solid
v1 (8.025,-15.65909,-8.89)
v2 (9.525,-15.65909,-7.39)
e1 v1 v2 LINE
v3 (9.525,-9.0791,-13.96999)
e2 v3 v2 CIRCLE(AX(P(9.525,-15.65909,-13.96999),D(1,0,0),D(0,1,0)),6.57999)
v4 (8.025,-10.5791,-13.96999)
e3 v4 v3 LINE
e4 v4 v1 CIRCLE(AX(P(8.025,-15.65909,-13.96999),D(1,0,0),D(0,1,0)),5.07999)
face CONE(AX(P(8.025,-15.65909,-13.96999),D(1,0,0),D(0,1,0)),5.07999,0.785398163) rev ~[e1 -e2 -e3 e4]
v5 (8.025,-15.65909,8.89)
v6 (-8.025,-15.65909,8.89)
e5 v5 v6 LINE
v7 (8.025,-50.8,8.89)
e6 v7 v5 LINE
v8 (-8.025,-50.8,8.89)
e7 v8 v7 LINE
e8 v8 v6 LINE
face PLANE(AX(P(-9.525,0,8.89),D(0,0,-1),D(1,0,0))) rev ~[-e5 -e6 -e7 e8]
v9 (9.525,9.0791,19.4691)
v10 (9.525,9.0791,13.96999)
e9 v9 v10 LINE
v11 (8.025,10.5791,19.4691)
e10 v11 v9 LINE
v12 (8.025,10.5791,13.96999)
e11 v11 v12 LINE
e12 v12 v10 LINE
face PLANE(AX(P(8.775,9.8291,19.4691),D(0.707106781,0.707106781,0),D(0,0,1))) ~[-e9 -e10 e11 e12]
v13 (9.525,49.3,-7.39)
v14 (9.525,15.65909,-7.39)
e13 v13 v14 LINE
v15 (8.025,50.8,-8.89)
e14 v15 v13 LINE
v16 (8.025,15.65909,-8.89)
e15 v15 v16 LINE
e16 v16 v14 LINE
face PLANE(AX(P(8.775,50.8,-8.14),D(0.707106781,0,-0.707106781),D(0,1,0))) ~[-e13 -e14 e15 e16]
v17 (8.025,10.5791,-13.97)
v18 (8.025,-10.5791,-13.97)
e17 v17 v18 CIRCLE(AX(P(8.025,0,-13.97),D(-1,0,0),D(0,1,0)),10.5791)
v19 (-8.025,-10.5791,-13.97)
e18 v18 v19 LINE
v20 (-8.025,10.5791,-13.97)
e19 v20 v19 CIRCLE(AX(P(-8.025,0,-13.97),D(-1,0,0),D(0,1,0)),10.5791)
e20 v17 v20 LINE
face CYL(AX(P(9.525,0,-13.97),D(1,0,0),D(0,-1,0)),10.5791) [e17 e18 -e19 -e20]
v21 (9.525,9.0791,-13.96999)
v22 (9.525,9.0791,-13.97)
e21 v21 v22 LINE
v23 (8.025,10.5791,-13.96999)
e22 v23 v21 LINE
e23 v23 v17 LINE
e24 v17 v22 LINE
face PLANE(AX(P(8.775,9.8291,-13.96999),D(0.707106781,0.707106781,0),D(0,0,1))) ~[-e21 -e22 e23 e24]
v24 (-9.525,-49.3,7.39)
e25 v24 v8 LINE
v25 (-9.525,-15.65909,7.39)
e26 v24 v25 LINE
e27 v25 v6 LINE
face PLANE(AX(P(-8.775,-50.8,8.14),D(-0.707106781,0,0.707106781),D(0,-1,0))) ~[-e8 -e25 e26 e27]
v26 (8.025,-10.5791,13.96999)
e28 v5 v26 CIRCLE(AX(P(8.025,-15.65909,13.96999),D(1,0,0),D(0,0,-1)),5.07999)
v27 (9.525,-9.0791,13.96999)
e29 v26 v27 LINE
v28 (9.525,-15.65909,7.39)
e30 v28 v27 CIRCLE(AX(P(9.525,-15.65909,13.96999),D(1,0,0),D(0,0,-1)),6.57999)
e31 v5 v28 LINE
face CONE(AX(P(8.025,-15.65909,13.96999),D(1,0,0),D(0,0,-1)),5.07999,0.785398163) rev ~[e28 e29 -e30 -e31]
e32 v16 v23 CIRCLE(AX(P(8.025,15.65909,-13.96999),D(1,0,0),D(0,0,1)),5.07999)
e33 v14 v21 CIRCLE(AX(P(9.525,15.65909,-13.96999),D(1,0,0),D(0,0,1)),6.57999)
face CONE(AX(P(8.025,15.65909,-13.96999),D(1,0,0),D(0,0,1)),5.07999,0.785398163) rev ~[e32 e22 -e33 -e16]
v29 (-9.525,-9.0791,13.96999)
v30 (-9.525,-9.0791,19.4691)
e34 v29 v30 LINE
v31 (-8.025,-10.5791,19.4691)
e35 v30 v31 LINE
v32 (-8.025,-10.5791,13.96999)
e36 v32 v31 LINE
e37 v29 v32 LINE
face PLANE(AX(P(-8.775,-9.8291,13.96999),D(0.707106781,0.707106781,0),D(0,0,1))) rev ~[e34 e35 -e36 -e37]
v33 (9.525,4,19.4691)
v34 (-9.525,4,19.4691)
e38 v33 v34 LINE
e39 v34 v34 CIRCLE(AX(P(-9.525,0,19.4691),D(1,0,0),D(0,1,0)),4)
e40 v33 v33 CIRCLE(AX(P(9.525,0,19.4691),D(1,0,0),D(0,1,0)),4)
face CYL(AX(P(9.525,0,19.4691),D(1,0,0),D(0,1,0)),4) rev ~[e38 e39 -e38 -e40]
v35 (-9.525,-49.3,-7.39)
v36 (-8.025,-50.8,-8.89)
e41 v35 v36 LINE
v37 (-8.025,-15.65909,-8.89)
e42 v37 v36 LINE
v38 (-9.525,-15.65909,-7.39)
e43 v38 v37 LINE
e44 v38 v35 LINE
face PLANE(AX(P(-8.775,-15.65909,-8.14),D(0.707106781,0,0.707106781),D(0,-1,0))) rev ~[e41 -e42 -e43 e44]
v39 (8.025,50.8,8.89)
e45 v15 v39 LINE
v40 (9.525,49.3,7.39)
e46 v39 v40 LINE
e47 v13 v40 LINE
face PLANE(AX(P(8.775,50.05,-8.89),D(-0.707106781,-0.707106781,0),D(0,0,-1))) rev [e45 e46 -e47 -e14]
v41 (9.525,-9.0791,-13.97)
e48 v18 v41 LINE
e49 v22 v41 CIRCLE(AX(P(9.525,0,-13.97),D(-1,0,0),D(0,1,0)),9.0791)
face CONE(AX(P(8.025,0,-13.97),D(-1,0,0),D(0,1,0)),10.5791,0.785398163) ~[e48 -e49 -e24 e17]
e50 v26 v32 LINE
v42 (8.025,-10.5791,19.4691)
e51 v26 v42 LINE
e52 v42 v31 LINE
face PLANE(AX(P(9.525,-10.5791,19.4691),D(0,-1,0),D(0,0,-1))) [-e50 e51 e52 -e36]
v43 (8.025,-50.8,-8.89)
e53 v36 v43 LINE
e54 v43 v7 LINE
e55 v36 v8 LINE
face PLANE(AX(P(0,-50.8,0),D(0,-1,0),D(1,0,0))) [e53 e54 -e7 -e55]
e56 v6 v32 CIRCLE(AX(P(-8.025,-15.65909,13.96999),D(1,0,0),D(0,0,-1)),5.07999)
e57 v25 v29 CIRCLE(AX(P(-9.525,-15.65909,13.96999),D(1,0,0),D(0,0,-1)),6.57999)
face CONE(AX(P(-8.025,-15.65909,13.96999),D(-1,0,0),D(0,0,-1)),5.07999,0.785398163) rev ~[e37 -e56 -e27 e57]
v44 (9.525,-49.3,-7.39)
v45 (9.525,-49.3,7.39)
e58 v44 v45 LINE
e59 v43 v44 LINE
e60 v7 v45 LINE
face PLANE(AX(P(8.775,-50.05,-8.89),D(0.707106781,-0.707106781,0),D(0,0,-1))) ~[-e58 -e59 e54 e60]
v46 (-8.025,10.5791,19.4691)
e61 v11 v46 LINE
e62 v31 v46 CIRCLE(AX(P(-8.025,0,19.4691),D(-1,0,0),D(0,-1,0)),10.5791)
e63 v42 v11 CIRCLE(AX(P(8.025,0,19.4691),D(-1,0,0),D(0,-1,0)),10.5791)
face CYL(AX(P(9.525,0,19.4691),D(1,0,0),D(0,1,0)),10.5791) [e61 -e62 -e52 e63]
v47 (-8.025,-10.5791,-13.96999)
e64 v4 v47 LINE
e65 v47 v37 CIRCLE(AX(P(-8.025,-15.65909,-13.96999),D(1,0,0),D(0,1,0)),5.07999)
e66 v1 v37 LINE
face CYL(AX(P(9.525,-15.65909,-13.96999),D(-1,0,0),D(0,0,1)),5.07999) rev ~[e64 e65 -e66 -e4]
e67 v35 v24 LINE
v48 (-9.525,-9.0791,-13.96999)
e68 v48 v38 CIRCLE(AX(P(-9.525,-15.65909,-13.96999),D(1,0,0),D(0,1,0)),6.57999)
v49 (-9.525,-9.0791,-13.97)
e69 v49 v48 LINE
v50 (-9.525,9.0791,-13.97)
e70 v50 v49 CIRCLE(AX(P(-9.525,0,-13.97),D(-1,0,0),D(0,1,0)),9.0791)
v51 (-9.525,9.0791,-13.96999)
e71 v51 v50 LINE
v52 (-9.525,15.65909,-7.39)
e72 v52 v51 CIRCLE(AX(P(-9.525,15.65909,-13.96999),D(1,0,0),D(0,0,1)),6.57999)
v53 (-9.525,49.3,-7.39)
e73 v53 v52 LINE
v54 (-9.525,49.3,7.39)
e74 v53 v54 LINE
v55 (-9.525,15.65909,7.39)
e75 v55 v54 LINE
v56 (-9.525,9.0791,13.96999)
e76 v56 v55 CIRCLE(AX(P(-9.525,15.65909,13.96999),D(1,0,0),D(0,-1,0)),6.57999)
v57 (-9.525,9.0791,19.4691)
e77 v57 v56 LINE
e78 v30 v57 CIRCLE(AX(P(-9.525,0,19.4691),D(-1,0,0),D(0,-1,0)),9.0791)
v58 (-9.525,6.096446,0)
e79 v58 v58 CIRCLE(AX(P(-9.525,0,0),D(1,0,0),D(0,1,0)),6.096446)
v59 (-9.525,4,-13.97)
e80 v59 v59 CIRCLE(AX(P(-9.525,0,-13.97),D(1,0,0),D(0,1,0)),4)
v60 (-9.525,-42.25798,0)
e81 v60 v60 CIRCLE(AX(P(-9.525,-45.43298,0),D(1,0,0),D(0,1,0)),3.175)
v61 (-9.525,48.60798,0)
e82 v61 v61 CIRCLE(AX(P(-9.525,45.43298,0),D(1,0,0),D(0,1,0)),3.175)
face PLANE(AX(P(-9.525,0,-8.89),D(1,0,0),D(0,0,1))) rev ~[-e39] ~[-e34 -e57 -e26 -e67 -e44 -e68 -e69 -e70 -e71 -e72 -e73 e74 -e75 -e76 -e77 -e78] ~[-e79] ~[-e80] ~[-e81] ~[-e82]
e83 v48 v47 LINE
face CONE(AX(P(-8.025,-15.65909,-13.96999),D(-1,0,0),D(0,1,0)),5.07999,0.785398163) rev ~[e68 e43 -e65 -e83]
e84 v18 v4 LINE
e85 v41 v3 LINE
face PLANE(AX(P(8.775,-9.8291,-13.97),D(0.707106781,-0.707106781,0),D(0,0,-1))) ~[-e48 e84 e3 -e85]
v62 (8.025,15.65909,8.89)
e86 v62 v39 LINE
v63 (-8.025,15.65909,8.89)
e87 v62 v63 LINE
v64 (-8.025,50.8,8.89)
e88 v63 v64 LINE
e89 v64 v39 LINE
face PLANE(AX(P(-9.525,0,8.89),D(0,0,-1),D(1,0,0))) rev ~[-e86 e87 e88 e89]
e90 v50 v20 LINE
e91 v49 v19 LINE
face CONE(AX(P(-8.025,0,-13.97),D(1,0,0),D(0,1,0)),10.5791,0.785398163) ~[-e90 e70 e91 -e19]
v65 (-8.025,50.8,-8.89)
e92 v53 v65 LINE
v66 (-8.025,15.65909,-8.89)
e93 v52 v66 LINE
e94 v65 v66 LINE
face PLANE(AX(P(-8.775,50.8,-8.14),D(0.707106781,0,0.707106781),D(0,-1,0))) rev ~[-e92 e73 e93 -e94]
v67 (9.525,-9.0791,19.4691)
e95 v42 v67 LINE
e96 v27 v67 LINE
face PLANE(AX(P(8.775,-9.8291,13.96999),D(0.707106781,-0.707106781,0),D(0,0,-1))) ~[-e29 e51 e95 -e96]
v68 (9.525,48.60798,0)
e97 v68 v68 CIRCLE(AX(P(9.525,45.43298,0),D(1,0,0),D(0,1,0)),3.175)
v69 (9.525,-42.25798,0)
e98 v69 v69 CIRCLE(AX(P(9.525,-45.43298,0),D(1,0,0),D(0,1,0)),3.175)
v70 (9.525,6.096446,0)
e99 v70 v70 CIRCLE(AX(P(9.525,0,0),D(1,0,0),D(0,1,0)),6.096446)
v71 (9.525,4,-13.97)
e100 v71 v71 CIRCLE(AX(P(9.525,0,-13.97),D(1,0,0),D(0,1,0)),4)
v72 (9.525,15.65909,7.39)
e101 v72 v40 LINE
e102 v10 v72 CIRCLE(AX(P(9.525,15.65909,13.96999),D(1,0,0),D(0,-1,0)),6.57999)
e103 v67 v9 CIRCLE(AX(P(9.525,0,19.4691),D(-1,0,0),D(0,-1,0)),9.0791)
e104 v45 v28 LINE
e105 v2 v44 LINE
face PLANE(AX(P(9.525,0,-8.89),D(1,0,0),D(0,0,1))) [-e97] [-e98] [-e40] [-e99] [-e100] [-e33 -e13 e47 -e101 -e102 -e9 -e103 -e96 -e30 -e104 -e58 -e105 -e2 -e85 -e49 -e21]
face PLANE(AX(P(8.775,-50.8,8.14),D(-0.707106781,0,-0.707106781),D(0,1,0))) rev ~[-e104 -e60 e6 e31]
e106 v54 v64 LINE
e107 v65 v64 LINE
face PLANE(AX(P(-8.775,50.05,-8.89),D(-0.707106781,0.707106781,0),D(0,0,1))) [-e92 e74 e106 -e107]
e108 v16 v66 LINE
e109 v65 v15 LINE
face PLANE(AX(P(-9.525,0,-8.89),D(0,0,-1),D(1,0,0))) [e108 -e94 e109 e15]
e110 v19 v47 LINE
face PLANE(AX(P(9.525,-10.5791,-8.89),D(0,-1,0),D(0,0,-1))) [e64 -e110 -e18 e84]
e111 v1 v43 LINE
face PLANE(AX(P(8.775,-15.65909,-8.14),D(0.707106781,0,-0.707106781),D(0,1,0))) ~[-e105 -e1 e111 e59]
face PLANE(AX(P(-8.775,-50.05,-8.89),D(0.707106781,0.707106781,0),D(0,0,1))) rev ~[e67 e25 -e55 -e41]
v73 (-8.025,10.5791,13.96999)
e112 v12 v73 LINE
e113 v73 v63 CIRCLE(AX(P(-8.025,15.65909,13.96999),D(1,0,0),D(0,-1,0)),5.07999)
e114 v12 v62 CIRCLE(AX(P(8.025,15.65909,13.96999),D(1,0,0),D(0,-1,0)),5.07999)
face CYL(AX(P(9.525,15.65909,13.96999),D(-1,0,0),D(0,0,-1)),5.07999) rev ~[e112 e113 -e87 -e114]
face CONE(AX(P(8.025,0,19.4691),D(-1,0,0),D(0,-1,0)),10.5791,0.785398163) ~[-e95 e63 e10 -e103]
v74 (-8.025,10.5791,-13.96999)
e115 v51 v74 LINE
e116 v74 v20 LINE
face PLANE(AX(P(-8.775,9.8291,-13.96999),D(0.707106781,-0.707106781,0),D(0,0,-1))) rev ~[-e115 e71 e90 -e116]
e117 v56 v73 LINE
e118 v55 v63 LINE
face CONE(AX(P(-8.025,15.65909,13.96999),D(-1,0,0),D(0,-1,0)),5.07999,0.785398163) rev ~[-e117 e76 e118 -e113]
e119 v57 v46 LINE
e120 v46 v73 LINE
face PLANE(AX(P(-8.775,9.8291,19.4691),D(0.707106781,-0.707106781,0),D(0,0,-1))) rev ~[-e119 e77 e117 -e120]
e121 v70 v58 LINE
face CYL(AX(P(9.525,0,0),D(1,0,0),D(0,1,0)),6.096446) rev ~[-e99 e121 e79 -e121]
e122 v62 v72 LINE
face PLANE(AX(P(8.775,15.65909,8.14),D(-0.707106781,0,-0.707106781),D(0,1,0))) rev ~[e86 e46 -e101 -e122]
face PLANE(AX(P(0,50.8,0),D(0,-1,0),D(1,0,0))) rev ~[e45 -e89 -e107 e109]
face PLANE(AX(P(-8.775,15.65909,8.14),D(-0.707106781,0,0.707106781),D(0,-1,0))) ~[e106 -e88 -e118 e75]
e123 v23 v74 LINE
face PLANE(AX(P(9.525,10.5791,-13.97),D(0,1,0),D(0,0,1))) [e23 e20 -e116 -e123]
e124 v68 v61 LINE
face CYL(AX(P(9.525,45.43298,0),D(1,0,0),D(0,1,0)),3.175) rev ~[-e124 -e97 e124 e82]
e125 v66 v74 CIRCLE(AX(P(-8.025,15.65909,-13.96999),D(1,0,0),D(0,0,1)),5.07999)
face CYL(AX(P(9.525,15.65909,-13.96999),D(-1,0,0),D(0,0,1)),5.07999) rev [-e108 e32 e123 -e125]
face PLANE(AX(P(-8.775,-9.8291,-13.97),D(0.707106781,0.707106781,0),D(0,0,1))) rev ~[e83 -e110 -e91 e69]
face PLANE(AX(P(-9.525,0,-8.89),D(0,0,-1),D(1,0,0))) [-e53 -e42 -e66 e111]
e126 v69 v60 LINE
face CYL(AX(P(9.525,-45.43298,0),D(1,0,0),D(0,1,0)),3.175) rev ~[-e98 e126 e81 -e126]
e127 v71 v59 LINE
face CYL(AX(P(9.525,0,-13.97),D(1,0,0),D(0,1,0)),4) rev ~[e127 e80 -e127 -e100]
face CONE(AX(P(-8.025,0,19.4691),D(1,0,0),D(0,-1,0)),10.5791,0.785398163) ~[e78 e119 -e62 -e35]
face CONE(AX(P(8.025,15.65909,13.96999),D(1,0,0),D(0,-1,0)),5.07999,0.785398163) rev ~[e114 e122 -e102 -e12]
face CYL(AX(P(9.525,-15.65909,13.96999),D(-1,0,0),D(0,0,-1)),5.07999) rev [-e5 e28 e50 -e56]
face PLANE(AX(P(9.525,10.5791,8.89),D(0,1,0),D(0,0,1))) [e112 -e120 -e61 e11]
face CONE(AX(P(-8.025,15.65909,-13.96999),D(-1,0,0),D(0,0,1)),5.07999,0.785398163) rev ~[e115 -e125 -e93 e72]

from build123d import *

# Parameters (mm, degrees)
F0_W     = 19.05
F0_H     = 17.78
F1_DEPTH = 50.8
F2_R     = 3.175
F2_R_2   = 6.0964456607
F3_DEPTH = 19.051
F4_R     = 4
F5_DEPTH = 19.05
F6_R     = 5.07999
F7_SIZE  = 1.5


# Not quite as in the source:
# - a fillet or chamfer is up to 0.001 mm smaller than in the source, because OpenCascade refuses the exact size


with BuildPart() as f1:
    # F0 (on Front) → F1 (new body, symmetric)
    with BuildSketch(Plane.XZ):
        Rectangle(F0_W, F0_H)
    extrude(amount=F1_DEPTH, both=True)

    # F2 (on face) → F3 (cut, through all)
    with BuildSketch(Plane.YZ.offset(9.525)):
        with Locations((-45.43298, 0)):
            Circle(F2_R)
        with Locations((45.43298, 0)):
            Circle(F2_R)
        Circle(F2_R_2)
    extrude(amount=-F3_DEPTH, mode=Mode.SUBTRACT)

    # F4 (on face) → F5 (join, through all)
    with BuildSketch(Plane.YZ.offset(9.525)):
        with BuildLine():
            Line((-10.5791, 19.4691), (-10.5791, 8.89))
            Line((-10.5791, 8.89), (10.5791, 8.89))
            Line((10.5791, 8.89), (10.5791, 19.4691))
            ThreePointArc((10.5791, 19.4691), (0, 30.0482), (-10.5791, 19.4691))
        make_face()
        with Locations((0, 19.4691)):
            Circle(F4_R, mode=Mode.SUBTRACT)
        with BuildLine():
            Line((-10.5791, -8.89), (-10.5791, -13.97))
            ThreePointArc((-10.5791, -13.97), (0, -24.5491), (10.5791, -13.97))
            Line((10.5791, -13.97), (10.5791, -8.89))
            Line((10.5791, -8.89), (-10.5791, -8.89))
        make_face()
        with Locations((0, -13.97)):
            Circle(F4_R, mode=Mode.SUBTRACT)
    extrude(amount=-F5_DEPTH)

    # F6 (radius 5.08 in the source; OpenCascade refuses exactly that, so slightly less here)
    f6_edges = [f1.edges().sort_by_distance(p)[0] for p in [
        (0, -10.5791, 8.89),
        (0, 10.5791, 8.89),
        (0, -10.5791, -8.89),
        (0, 10.5791, -8.89),
    ]]
    fillet(f6_edges, radius=F6_R)

    # F7
    f7_edges = [f1.edges().sort_by_distance(p)[0] for p in [
        (9.525, -33.229545, 8.89),
        (9.525, -33.229545, -8.89),
        (-9.525, -33.229545, 8.89),
        (-9.525, -33.229545, -8.89),
        (-9.525, -50.8, 0),
        (-9.525, 50.8, 0),
        (9.525, -50.8, 0),
        (9.525, 50.8, 0),
    ]]
    chamfer(f7_edges, length=F7_SIZE)


solid = f1.part
